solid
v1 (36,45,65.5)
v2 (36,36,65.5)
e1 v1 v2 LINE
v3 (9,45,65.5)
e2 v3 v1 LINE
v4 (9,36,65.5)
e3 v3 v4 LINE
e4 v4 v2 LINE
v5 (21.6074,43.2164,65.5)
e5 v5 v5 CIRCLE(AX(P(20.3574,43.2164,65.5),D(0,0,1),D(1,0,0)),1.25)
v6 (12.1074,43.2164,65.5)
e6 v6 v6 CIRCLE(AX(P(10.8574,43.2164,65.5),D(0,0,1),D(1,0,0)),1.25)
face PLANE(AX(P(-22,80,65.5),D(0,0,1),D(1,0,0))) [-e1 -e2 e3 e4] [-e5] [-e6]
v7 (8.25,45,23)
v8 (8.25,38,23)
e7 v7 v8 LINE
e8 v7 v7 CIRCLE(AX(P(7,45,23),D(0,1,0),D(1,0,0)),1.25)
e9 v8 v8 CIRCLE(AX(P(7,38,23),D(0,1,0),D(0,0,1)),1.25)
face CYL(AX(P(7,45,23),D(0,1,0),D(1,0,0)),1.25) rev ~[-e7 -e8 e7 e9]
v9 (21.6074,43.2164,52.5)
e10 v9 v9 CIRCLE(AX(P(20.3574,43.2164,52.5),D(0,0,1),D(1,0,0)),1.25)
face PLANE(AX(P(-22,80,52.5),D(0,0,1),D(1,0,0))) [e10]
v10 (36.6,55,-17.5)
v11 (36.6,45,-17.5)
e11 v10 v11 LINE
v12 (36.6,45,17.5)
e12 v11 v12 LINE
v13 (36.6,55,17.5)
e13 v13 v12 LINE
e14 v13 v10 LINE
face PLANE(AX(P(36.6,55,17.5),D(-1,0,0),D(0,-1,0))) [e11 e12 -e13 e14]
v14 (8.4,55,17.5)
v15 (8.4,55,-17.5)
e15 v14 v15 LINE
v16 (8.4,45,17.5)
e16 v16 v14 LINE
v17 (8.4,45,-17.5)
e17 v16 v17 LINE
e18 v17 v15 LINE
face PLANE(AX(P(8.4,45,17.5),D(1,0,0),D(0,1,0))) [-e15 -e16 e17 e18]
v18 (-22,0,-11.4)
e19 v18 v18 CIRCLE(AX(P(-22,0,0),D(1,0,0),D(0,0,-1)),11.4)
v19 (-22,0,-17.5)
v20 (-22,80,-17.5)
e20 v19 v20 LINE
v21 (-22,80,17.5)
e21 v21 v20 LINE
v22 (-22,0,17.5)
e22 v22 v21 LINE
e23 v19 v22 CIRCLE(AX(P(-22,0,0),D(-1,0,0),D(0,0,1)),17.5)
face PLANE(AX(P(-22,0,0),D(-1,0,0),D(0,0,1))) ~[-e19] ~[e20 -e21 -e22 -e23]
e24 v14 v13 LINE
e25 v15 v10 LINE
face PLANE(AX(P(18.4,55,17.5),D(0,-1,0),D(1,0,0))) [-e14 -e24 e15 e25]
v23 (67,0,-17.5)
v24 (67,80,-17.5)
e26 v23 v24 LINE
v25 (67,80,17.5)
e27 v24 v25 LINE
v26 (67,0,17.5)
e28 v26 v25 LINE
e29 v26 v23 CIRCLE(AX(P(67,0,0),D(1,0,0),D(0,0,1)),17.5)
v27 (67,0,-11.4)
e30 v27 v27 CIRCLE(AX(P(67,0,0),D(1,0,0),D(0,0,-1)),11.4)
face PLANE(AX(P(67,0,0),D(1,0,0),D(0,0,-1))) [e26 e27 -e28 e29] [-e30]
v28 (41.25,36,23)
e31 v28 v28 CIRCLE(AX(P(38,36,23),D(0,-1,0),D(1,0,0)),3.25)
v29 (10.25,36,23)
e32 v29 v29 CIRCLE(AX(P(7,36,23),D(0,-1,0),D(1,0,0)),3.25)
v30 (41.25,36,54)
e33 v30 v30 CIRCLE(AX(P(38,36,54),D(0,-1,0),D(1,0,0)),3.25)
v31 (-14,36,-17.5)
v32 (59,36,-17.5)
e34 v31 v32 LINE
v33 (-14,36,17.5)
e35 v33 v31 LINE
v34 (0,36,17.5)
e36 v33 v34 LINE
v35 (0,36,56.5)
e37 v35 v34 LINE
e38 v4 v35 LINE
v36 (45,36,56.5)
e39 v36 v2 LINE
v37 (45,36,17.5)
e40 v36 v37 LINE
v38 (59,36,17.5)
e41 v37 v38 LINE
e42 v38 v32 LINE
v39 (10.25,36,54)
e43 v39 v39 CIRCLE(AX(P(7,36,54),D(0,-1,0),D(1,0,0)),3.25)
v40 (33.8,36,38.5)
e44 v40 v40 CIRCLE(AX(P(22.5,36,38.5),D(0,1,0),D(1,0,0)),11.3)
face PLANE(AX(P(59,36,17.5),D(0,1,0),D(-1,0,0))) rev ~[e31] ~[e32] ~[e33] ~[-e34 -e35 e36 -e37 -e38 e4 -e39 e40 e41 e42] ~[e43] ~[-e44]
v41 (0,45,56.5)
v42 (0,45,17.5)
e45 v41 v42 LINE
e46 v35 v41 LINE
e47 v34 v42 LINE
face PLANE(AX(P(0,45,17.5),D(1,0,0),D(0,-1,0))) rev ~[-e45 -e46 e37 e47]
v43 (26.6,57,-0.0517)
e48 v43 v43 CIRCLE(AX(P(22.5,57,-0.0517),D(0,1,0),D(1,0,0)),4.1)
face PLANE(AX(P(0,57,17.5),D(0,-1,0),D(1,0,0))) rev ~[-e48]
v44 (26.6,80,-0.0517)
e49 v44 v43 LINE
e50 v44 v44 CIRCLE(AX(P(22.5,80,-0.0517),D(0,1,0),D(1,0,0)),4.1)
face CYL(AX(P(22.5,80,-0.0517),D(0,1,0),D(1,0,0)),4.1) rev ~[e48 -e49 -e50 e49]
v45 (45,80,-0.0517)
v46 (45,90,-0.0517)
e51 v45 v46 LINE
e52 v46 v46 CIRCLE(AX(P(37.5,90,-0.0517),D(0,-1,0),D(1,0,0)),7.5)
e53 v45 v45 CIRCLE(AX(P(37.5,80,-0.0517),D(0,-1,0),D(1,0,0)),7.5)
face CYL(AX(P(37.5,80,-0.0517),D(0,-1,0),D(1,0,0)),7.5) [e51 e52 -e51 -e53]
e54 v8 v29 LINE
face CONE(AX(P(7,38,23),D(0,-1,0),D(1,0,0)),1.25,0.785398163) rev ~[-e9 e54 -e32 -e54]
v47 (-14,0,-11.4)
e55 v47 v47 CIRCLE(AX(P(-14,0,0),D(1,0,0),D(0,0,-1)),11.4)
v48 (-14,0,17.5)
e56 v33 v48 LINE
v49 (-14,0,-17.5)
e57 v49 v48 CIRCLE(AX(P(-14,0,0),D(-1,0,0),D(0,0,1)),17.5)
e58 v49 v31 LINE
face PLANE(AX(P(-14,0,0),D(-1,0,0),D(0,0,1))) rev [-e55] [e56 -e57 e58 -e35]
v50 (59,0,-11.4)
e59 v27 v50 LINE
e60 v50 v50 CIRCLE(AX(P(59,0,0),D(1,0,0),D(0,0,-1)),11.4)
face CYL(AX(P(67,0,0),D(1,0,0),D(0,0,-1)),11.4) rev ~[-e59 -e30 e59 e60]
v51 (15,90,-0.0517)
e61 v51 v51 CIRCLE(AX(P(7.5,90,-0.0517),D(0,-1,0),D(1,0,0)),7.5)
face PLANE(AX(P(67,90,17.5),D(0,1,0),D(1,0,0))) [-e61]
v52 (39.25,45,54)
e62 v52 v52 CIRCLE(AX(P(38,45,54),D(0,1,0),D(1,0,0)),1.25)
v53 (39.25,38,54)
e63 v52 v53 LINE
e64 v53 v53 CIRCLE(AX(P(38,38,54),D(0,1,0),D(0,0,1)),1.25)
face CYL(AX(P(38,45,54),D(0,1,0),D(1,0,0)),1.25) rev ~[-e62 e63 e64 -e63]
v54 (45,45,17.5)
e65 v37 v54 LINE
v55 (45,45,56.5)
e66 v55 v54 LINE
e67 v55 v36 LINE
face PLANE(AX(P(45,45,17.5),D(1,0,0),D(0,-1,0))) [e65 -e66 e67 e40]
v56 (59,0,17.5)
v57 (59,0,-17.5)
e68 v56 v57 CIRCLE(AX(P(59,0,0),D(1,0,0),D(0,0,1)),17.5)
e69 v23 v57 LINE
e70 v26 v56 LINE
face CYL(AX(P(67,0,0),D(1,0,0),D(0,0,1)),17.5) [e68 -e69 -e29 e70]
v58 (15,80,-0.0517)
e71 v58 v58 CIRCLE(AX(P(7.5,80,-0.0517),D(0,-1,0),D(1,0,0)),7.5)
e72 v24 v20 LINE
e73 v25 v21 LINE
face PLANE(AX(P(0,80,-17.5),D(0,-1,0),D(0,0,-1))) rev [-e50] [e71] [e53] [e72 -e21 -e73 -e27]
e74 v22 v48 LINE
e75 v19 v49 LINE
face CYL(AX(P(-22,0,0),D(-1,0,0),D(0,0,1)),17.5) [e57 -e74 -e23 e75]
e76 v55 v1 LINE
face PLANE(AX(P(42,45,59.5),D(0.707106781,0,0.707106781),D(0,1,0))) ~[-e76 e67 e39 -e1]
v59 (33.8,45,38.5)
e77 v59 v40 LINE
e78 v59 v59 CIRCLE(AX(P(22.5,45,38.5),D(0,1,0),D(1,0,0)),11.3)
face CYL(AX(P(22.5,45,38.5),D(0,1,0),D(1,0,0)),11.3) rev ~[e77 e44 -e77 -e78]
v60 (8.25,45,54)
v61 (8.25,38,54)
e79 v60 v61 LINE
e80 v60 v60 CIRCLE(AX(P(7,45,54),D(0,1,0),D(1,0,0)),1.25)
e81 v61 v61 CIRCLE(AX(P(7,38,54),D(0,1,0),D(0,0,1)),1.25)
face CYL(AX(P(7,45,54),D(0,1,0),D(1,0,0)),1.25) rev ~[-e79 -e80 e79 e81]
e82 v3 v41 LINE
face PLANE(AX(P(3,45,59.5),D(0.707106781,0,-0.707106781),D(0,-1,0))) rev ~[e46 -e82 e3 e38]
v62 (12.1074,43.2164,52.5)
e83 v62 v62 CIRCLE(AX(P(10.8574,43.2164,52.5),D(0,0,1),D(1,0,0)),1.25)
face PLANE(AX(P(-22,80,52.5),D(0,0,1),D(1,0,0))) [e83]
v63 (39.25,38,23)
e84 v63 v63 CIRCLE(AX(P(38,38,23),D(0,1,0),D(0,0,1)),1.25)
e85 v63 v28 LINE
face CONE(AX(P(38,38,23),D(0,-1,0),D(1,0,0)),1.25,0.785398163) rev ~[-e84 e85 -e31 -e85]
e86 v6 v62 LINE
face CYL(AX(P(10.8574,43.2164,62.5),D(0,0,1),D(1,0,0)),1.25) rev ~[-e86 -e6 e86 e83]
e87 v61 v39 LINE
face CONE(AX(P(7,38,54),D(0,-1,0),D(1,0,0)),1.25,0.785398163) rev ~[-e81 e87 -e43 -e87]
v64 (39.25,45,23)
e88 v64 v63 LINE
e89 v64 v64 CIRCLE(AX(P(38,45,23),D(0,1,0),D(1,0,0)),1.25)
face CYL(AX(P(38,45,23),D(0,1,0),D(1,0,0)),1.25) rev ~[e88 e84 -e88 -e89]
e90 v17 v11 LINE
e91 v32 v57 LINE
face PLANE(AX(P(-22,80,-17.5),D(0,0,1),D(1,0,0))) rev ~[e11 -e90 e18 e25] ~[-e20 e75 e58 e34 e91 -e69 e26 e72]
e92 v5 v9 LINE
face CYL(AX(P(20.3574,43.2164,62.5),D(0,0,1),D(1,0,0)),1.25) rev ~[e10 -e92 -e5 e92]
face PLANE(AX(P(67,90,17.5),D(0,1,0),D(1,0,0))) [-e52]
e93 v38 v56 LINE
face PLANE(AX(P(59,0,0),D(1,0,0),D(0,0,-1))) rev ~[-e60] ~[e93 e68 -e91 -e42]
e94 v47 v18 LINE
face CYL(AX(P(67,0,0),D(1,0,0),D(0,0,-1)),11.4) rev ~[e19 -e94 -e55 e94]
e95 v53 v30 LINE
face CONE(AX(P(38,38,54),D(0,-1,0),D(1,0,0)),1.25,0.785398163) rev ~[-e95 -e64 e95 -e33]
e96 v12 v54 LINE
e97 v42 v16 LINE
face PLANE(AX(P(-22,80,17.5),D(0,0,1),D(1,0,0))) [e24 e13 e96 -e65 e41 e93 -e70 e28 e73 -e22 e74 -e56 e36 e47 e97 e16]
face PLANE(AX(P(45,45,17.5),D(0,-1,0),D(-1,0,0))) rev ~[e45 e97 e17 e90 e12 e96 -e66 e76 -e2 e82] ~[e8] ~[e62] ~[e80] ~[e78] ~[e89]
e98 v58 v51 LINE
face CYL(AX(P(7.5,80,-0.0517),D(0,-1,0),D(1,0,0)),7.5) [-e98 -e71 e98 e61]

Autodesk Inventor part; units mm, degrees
ref_plane "YZ Plane" through (0, 0, 0) normal (1, 0, 0) x (0, 1, 0)
ref_plane "XZ Plane" through (0, 0, 0) normal (0, 1, 0) x (-1, 0, 0)
sketch "Эскиз1" plane through (0, 0, 0) normal (1, 0, 0) x (0, 1, 0)
  line L0 (-6, -6.0208) -> (-6, 6.0208)
  arc A0 (-6, -6.0208) -> (6, -6.0208) centre (0, 0) ccw
  line L1 (6, 6.0208) -> (6, -6.0208)
  arc A1 (6, 6.0208) -> (-6, 6.0208) centre (0, 0) ccw
  circle A2 centre (0, 0) radius 17.5
  line L2 (0, 17.5) -> (80, 17.5)
  line L3 (80, 17.5) -> (80, -17.5)
  line L4 (80, -17.5) -> (0, -17.5)
  line L5 (0, -17.5) -> (0, -8.5)
  line L6 (0, 8.5) -> (0, 17.5)
  dimension "d0" = 35
  dimension "d1" = 80
extrude "Выдавливание1" add sketch "Эскиз1" along normal blind 45 contours A0 L5 A2 L6 A1 L0 | A0 L1 A1 L6 A2 L5 | A2 L2 L3 L4
sketch "Эскиз2" plane through (45, 0, 0) normal (1, 0, 0) x (0, 0, -1)
  line L0 (17.5, 80) -> (-17.5, 80) projected
  line L1 (17.5, 0) -> (17.5, 80) projected
  line L2 (-17.5, 80) -> (17.5, 80)
  line L3 (17.5, 80) -> (17.5, 57)
  line L4 (17.5, 57) -> (-17.5, 57)
  line L5 (-17.5, 57) -> (-17.5, 80)
  point P0 (0, 0)
  dimension "d4" = 23
extrude "Выдавливание2" add sketch "Эскиз2" along normal blind 22
ref_plane "РабПлоскость1" through (22.5, 0, 17.5) normal (1, 0, 0) x (0, 0, -1)
mirror "Зеркальное отражение1" about plane through (22.5, 0, 17.5) normal (1, 0, 0) of "Выдавливание2"
sketch "Эскиз3" plane through (45, 0, 0) normal (1, 0, 0) x (0, 0, -1)
  arc A0 (6.0208, -6) -> (6.0208, 6) centre (0, 0) ccw projected
  line L0 (6.0208, -6) -> (-6.0208, -6) projected
  arc A1 (-6.0208, 6) -> (-6.0208, -6) centre (0, 0) ccw projected
  line L1 (6.0208, 6) -> (-6.0208, 6) projected
  line L2 (17.5, 57) -> (-17.5, 57) projected
  line L3 (-17.5, 57) -> (-17.5, 0) projected
  arc A2 (-17.5, 0) -> (17.5, 0) centre (0, 0) ccw projected
  line L4 (17.5, 0) -> (17.5, 57) projected
sketch "Эскиз4" plane through (67, 0, 0) normal (1, 0, 0) x (0, 0, -1)
  arc A0 (6.0208, -6) -> (6.0208, 6) centre (0, 0) ccw
  line L0 (6.0208, -6) -> (-6.0208, -6)
  arc A1 (-6.0208, 6) -> (-6.0208, -6) centre (0, 0) ccw
  line L1 (6.0208, 6) -> (-6.0208, 6)
  line L2 (17.5, 37) -> (-17.5, 37)
  line L3 (-17.5, 37) -> (-17.5, 0)
  arc A2 (-17.5, 0) -> (17.5, 0) centre (0, 0) ccw
  line L4 (17.5, 0) -> (17.5, 37)
  line L5 (17.5, 0) -> (17.5, 57) projected
  line L6 (-17.5, 37) -> (17.5, 37)
  line L7 (17.5, 37) -> (17.5, 57)
  line L8 (17.5, 57) -> (-17.5, 57)
  line L9 (-17.5, 57) -> (-17.5, 37)
extrude "Выдавливание3" add sketch "Эскиз4" against normal blind 8
mirror "Зеркальное отражение2" about plane through (22.5, 0, 17.5) normal (1, 0, 0) of "Выдавливание3"
sketch "Эскиз5" plane through (67, 80, 17.5) normal (0, 1, 0) x (1, 0, 0)
  line L0 (-89, 35) -> (-89, 0) projected
  line L1 (-89, 35.1034) -> (-89, 0)
  line L2 (-89, 0) -> (-89, 35.1034)
  line L3 (-89, 35) -> (0, 35) projected
  line L4 (-89, 35) -> (0, 35)
  line L5 (-89, 17.5517) -> (-44.5, 17.5517)
  circle A0 centre (-44.5, 17.5517) radius 4.1
  line L6 (-44.5, 17.5517) -> (-59.5, 17.5517)
  circle A1 centre (-59.5, 17.5517) radius 7.5
  line L7 (-44.5, 17.5517) -> (-29.5, 17.5517)
  circle A2 centre (-29.5, 17.5517) radius 7.5
  point P0 (-67, 17.5)
  dimension "d9" = 8.2
  dimension "d10" = 15
  dimension "d11" = 15
  dimension "d12" = 15
  dimension "d13" = 15
extrude "Выдавливание4" add sketch "Эскиз5" along normal blind 10 contours L5 A1 | L5 A1 | A2
sketch "Эскиз6" plane through (67, 80, 17.5) normal (0, 1, 0) x (1, 0, 0)
  line L0 (-89, 35) -> (-89, 0)
  line L1 (-89, 35.1034) -> (-89, 0)
  line L2 (-89, 0) -> (-89, 35.1034)
  line L3 (-89, 35) -> (0, 35)
  line L4 (-89, 35) -> (0, 35)
  line L5 (-89, 17.5517) -> (-44.5, 17.5517)
  circle A0 centre (-44.5, 17.5517) radius 4.1
  line L6 (-44.5, 17.5517) -> (-59.5, 17.5517)
  circle A1 centre (-59.5, 17.5517) radius 7.5
  line L7 (-44.5, 17.5517) -> (-29.5, 17.5517)
  circle A2 centre (-29.5, 17.5517) radius 7.5
  point P0 (-67, 17.5)
  point P1 (-67, 17.5)
  dimension "d16" = 8.2
  dimension "d17" = 15
  dimension "d18" = 15
  dimension "d19" = 15
  dimension "d20" = 15
extrude "Выдавливание5" cut sketch "Эскиз6" against normal blind 35 contours A0 L7 L5 | L5 L7 A0
sketch "Эскиз7" plane through (0, 0, 17.5) normal (0, 0, 1) x (1, 0, 0)
  line L0 (18.4, 80) -> (18.4, 45) projected
  line L1 (26.6, 80) -> (26.6, 45) projected
  line L2 (0, 57) -> (0, 0) projected
  line L3 (45, 0) -> (0, 0) projected
  line L4 (45, 57) -> (45, 0) projected
  line L5 (45, 57) -> (59, 57) projected
  line L6 (67, 80) -> (67, 0) projected
  line L7 (-22, 80) -> (67, 80) projected
  line L8 (-22, 80) -> (-22, 0) projected
  line L9 (0, 57) -> (-14, 57) projected
  line L10 (18.4, 45) -> (26.6, 45) projected
  line L11 (18.4, 45) -> (8.4, 45)
  line L12 (8.4, 45) -> (8.4, 55)
  line L13 (8.4, 55) -> (36.6, 55)
  line L14 (36.6, 55) -> (36.6, 45)
  line L15 (26.6, 45) -> (36.6, 45)
  line L16 (18.4, 45) -> (26.6, 45)
  line L17 (59, 0) -> (59, 57) projected
  line L18 (67, 0) -> (59, 0) projected
  line L19 (-22, 0) -> (-14, 0) projected
  line L20 (-14, 0) -> (-14, 57) projected
  dimension "d23" = 10
  dimension "d24" = 10
  dimension "d25" = 28.2
  dimension "d26" = 10
extrude "Выдавливание6" cut sketch "Эскиз7" against normal blind 84.5 contours L13 L1 L10 L0 | L0 L11 L12 L13 | L13 L14 L15 L1
sketch "Эскиз8" plane through (0, 0, 17.5) normal (0, 0, 1) x (1, 0, 0)
  line L0 (8.4, 45) -> (36.6, 45) projected
  line L1 (8.4, 45) -> (0, 45)
  line L2 (0, 45) -> (0, 36)
  line L3 (0, 0) -> (0, 57) projected
  line L4 (45, -17.5) -> (45, 0) projected
  line L5 (0, 36) -> (45, 36)
  line L6 (45, 36) -> (45, -17.5)
  line L7 (45, -17.5) -> (0, -17.5)
  line L8 (0, -17.5) -> (0, 36)
  dimension "d29" = 9
extrude "Выдавливание7" cut sketch "Эскиз8" against normal blind 85.25
sketch "Эскиз9" plane through (67, 0, 0) normal (1, 0, 0) x (0, 0, -1)
  circle A0 centre (0, 0) radius 11.4
  dimension "d32" = 22.8
extrude "Выдавливание8" cut sketch "Эскиз9" against normal blind 144.5
sketch "Эскиз10" plane through (-22, 80, 17.5) normal (0, 0, 1) x (1, 0, 0)
  line L0 (22, -23) -> (22, -44) projected
  line L1 (67, -23) -> (67, -44) projected
  line L2 (22, -44) -> (67, -44)
  line L3 (67, -44) -> (67, -35)
  line L4 (67, -35) -> (22, -35)
  line L5 (22, -35) -> (22, -44)
  point P0 (22, -80)
  dimension "d35" = 9
extrude "Выдавливание9" add sketch "Эскиз10" along normal blind 45
sketch "Эскиз11" plane through (67, 45, 17.5) normal (0, 1, 0) x (1, 0, 0)
  line L0 (-67, 0) -> (-67, 35) projected
  line L1 (-67, 0) -> (-44.5, 0)
  line L2 (-67, 0) -> (-58.6, 0) projected
  line L3 (-22, -45) -> (-67, -45) projected
  line L4 (-44.5, -45) -> (-44.5, -21)
  line L5 (-27, -42) -> (-23.5, -38.5)
  line L6 (-23.5, -38.5) -> (-23.5, -3.5)
  line L7 (-23.5, -3.5) -> (-27, 0)
  line L8 (-27, 0) -> (-62, 0)
  line L9 (-62, 0) -> (-65.5, -3.5)
  line L10 (-65.5, -3.5) -> (-65.5, -38.5)
  line L11 (-65.5, -38.5) -> (-62, -42)
  line L12 (-62, -42) -> (-27, -42)
  circle A0 centre (-44.5, -21) radius 11.3
  circle A1 centre (-29, -5.5) radius 1.25
  circle A2 centre (-60, -5.5) radius 1.25
  circle A3 centre (-60, -36.5) radius 1.25
  circle A4 centre (-29, -36.5) radius 1.25
  line L13 (-52.5, -48) -> (-50.5, -48)
  line L14 (-50.5, -41.8) -> (-50.5, -48)
  line L15 (-57.9172, -41.8) -> (-50.5, -41.8)
  line L16 (-65.3, -34.4172) -> (-57.9172, -41.8)
  line L17 (-65.3, -7.5828) -> (-65.3, -34.4172)
  line L18 (-57.9172, -0.2) -> (-65.3, -7.5828)
  line L19 (-31.0828, -0.2) -> (-57.9172, -0.2)
  line L20 (-23.7, -7.5828) -> (-31.0828, -0.2)
  line L21 (-23.7, -34.4172) -> (-23.7, -7.5828)
  line L22 (-31.0828, -41.8) -> (-23.7, -34.4172)
  line L23 (-38.5, -41.8) -> (-31.0828, -41.8)
  line L24 (-38.5, -41.8) -> (-38.5, -48)
  line L25 (-38.5, -48) -> (-36.5, -48)
  line L26 (-36.5, -48) -> (-36.5, -42)
  line L27 (-36.5, -42) -> (-27, -42)
  line L28 (-27, -42) -> (-23.5, -38.5)
  line L29 (-23.5, -38.5) -> (-23.5, -3.5)
  line L30 (-23.5, -3.5) -> (-27, 0)
  line L31 (-27, 0) -> (-62, 0)
  line L32 (-62, 0) -> (-65.5, -3.5)
  line L33 (-65.5, -3.5) -> (-65.5, -38.5)
  line L34 (-65.5, -38.5) -> (-62, -42)
  line L35 (-62, -42) -> (-52.5, -42)
  line L36 (-52.5, -42) -> (-52.5, -48)
  point P0 (-67, 17.5)
  dimension "d38" = 22.5
  dimension "d39" = 24
extrude "Выдавливание10" cut sketch "Эскиз11" against normal blind 45 contours A0 | A1 | A2 | A3 | A4
chamfer "Фаска1" distance 2 angle 45 4 edges at (5.75, 36, 54) (5.75, 36, 23) (36.75, 36, 23) (36.75, 36, 54)
chamfer "Фаска2" distance 6 angle 45 2 edges at (0, 40.5, 62.5) (45, 40.5, 62.5)
sketch "Эскиз13" plane through (-22, 80, 17.5) normal (0, 0, 1) x (1, 0, 0)
  line L0 (81, -80) -> (81, -23) projected
  line L1 (22, -23) -> (8, -23) projected
  line L2 (81, -44) -> (8, -44)
  line L3 (8, -44) -> (8, -23)
  line L4 (8, -23) -> (81, -23)
  line L5 (81, -23) -> (81, -44)
  line L6 (61, -44) -> (67, -44) projected
  line L7 (22, -35) -> (30.4, -35) projected
  line L8 (30.4, -25) -> (58.6, -25) projected
  line L9 (30.4, -35) -> (58.6, -35)
  line L10 (58.6, -35) -> (58.6, -25)
  line L11 (58.6, -25) -> (30.4, -25)
  line L12 (30.4, -25) -> (30.4, -35)
  point P0 (22, -80)
  dimension "d51" = 0
extrude "Выдавливание12" add sketch "Эскиз13" against normal up to surface (35 mm away)
sketch "Эскиз14" plane through (-22, 80, 62.5) normal (0, 0, 1) x (1, 0, 0)
  line L0 (27.8074, -44.5836) -> (28.32, -44.5836)
  line L1 (28.32, -44.5836) -> (28.4117, -43.1496)
  arc A0 (32.6031, -43.1496) -> (28.4117, -43.1496) centre (30.5074, -43.2836) ccw
  line L2 (32.6031, -43.1496) -> (32.6948, -44.5836)
  line L3 (32.6948, -44.5836) -> (36.9831, -44.5836)
  arc A1 (36.9831, -44.5836) -> (37.0538, -44.5543) centre (36.9831, -44.4836) ccw
  line L4 (37.0538, -44.5543) -> (37.3781, -44.23)
  arc A2 (37.7316, -44.0836) -> (37.3781, -44.23) centre (37.7316, -44.5836) ccw
  line L5 (37.7316, -44.0836) -> (47.4074, -44.0836)
  arc A3 (47.4074, -44.0836) -> (47.5074, -43.9836) centre (47.4074, -43.9836) ccw
  line L6 (47.5074, -43.9836) -> (47.5074, -34.8336)
  arc A4 (47.5074, -34.8336) -> (47.4074, -34.7336) centre (47.4074, -34.8336) ccw
  line L7 (47.4074, -34.7336) -> (44.4816, -34.7336)
  arc A5 (44.1281, -34.5871) -> (44.4816, -34.7336) centre (44.4816, -34.2336) ccw
  line L8 (44.1281, -34.5871) -> (43.8038, -34.2629)
  arc A6 (43.8038, -34.2629) -> (43.7331, -34.2336) centre (43.7331, -34.3336) ccw
  line L9 (43.7331, -34.2336) -> (40.9816, -34.2336)
  arc A7 (40.9816, -34.2336) -> (40.9109, -34.2629) centre (40.9816, -34.3336) ccw
  line L10 (40.9109, -34.2629) -> (40.5867, -34.5871)
  arc A8 (40.2331, -34.7336) -> (40.5867, -34.5871) centre (40.2331, -34.2336) ccw
  line L11 (40.2331, -34.7336) -> (34.9816, -34.7336)
  arc A9 (34.6281, -34.5871) -> (34.9816, -34.7336) centre (34.9816, -34.2336) ccw
  line L12 (34.6281, -34.5871) -> (34.3038, -34.2629)
  arc A10 (34.3038, -34.2629) -> (34.2331, -34.2336) centre (34.2331, -34.3336) ccw
  line L13 (34.2331, -34.2336) -> (31.4816, -34.2336)
  arc A11 (31.4816, -34.2336) -> (31.4109, -34.2629) centre (31.4816, -34.3336) ccw
  line L14 (31.4109, -34.2629) -> (31.0867, -34.5871)
  arc A12 (30.7331, -34.7336) -> (31.0867, -34.5871) centre (30.7331, -34.2336) ccw
  line L15 (30.7331, -34.7336) -> (27.8074, -34.7336)
  arc A13 (27.8074, -34.7336) -> (27.7074, -34.8336) centre (27.8074, -34.8336) ccw
  line L16 (27.7074, -34.8336) -> (27.7074, -44.4836)
  arc A14 (27.7074, -44.4836) -> (27.8074, -44.5836) centre (27.8074, -44.4836) ccw
  circle A15 centre (32.8574, -36.7836) radius 1.25
  circle A16 centre (42.3574, -36.7836) radius 1.25
  line L17 (43.5307, -39.0336) -> (42.914, -40.3336)
  line L18 (42.914, -40.3336) -> (42.8974, -40.3336)
  line L19 (42.8974, -40.3336) -> (42.2974, -39.0336)
  line L20 (42.2974, -39.0336) -> (42.4242, -39.0336)
  line L21 (42.4242, -39.0336) -> (42.6164, -39.4502)
  line L22 (42.6164, -39.4502) -> (43.2057, -39.4502)
  line L23 (43.2057, -39.4502) -> (43.4034, -39.0336)
  line L24 (43.4034, -39.0336) -> (43.5307, -39.0336)
  spline S0 degree 3 poles (40.7107, -39.97) (40.711, -39.9789) (40.7114, -39.9964) (40.7155, -40.022) (40.7217, -40.0467) (40.7306, -40.0706) (40.7424, -40.0934) (40.7567, -40.1152) (40.7731, -40.1363) (40.7922, -40.156) (40.8132, -40.1741) (40.8353, -40.1901) (40.8587, -40.2035) (40.8833, -40.2145) (40.909, -40.2231) (40.9359, -40.2291) (40.9639, -40.2328) (40.983, -40.2333) (40.9927, -40.2336) knots 0 0 0 0 0.061965 0.122122 0.180988 0.239933 0.299906 0.359989 0.421776 0.486576 0.551535 0.615018 0.677259 0.73973 0.80305 0.866495 0.931973 1 1 1 1
  spline S1 degree 3 poles (40.9927, -40.2336) (41.0029, -40.2333) (41.0229, -40.2328) (41.0522, -40.2291) (41.0802, -40.2228) (41.1068, -40.2142) (41.1323, -40.2033) (41.1564, -40.1897) (41.1791, -40.1734) (41.2004, -40.155) (41.22, -40.1344) (41.2373, -40.1115) (41.2523, -40.0867) (41.2655, -40.06) (41.2762, -40.0312) (41.2843, -40.0004) (41.2908, -39.9677) (41.2929, -39.9451) (41.294, -39.9336) knots 0 0 0 0 0.064439 0.126547 0.186887 0.245878 0.304041 0.362191 0.420976 0.48066 0.5406 0.600689 0.661936 0.724443 0.789038 0.856314 0.926352 1 1 1 1
  line L25 (41.294, -39.9336) -> (41.4107, -39.9336)
  spline S2 degree 3 poles (41.4107, -39.9336) (41.41, -39.949) (41.4085, -39.9794) (41.4015, -40.0238) (41.3915, -40.0661) (41.3773, -40.1062) (41.3597, -40.1443) (41.3387, -40.1803) (41.3137, -40.2141) (41.2854, -40.2454) (41.2547, -40.2741) (41.2215, -40.2988) (41.1866, -40.3197) (41.1502, -40.3372) (41.1118, -40.3504) (41.0717, -40.3601) (41.0298, -40.366) (41.0013, -40.3666) (40.9868, -40.3669) knots 0 0 0 0 0.068791 0.135103 0.198979 0.261904 0.323495 0.385195 0.446969 0.509765 0.572251 0.633405 0.693251 0.752583 0.812579 0.873275 0.93555 1 1 1 1
  spline S3 degree 3 poles (40.9868, -40.3669) (40.9725, -40.3666) (40.9445, -40.3659) (40.9036, -40.3603) (40.8647, -40.3515) (40.8278, -40.3391) (40.7933, -40.3225) (40.7608, -40.3025) (40.73, -40.2794) (40.7023, -40.2522) (40.6769, -40.2231) (40.6549, -40.1921) (40.6361, -40.1601) (40.6204, -40.1268) (40.6089, -40.0919) (40.6001, -40.056) (40.5952, -40.0186) (40.5944, -39.9933) (40.594, -39.9804) knots 0 0 0 0 0.069475 0.136517 0.200789 0.26383 0.325735 0.387291 0.449509 0.512968 0.576275 0.63758 0.697903 0.757172 0.816599 0.876653 0.93729 1 1 1 1
  spline S4 degree 3 poles (40.594, -39.9804) (40.5947, -39.9623) (40.5959, -39.9264) (40.6066, -39.8737) (40.6232, -39.8226) (40.6433, -39.7815) (40.6635, -39.7483) (40.6818, -39.721) (40.7031, -39.6916) (40.7279, -39.6603) (40.7556, -39.6266) (40.7864, -39.5908) (40.8206, -39.5531) (40.8446, -39.5274) (40.8571, -39.514) knots 0 0 0 0 0.098702 0.195672 0.292422 0.391343 0.444462 0.504229 0.570352 0.642546 0.722288 0.807921 0.90047 1 1 1 1
  line L26 (40.8571, -39.514) -> (41.1823, -39.1669)
  line L27 (41.1823, -39.1669) -> (40.5774, -39.1669)
  line L28 (40.5774, -39.1669) -> (40.5774, -39.0336)
  line L29 (40.5774, -39.0336) -> (41.4607, -39.0336)
  line L30 (41.4607, -39.0336) -> (40.9565, -39.5716)
  spline S5 degree 3 poles (40.9565, -39.5716) (40.9443, -39.5844) (40.9207, -39.609) (40.8873, -39.6449) (40.8574, -39.6783) (40.8306, -39.709) (40.8077, -39.7374) (40.7873, -39.7628) (40.771, -39.7861) (40.7532, -39.8131) (40.7361, -39.8461) (40.7213, -39.8864) (40.7123, -39.9279) (40.7113, -39.9559) (40.7107, -39.97) knots 0 0 0 0 0.110803 0.212829 0.306101 0.390647 0.466924 0.534481 0.593587 0.644557 0.7362 0.825024 0.911986 1 1 1 1
  line L31 (40.2007, -39.6836) -> (40.0674, -40.3336)
  line L32 (40.0674, -40.3336) -> (39.534, -40.3336)
  line L33 (39.534, -40.3336) -> (39.534, -40.2002)
  line L34 (39.534, -40.2002) -> (39.9762, -40.2002)
  line L35 (39.9762, -40.2002) -> (40.0463, -39.8583)
  spline S6 degree 3 poles (40.0463, -39.8583) (40.0325, -39.8621) (40.0059, -39.8695) (39.9665, -39.8776) (39.9291, -39.8826) (39.9049, -39.8832) (39.8932, -39.8836) knots 0 0 0 0 0.275068 0.532901 0.773973 1 1 1 1
  spline S7 degree 3 poles (39.8932, -39.8836) (39.8786, -39.8833) (39.8501, -39.8826) (39.8083, -39.8767) (39.7685, -39.8674) (39.7306, -39.8543) (39.6946, -39.8376) (39.6609, -39.8168) (39.6289, -39.7925) (39.5992, -39.7645) (39.5722, -39.7337) (39.5486, -39.7006) (39.5284, -39.6655) (39.5123, -39.628) (39.4993, -39.5887) (39.4907, -39.547) (39.485, -39.5033) (39.4844, -39.4735) (39.484, -39.4583) knots 0 0 0 0 0.065808 0.129394 0.190894 0.251281 0.310815 0.370371 0.430768 0.492881 0.555104 0.616067 0.677256 0.73826 0.800762 0.864778 0.931045 1 1 1 1
  spline S8 degree 3 poles (39.484, -39.4583) (39.4843, -39.4477) (39.4848, -39.4267) (39.4873, -39.3954) (39.4921, -39.3648) (39.4985, -39.3349) (39.5069, -39.3057) (39.517, -39.2771) (39.5295, -39.2493) (39.5431, -39.2221) (39.5584, -39.196) (39.5754, -39.1716) (39.5933, -39.1485) (39.6127, -39.1271) (39.6335, -39.1073) (39.6557, -39.0891) (39.679, -39.0722) (39.7038, -39.0573) (39.7294, -39.0436) (39.7564, -39.0323) (39.7841, -39.0222) (39.8128, -39.0142) (39.8426, -39.0079) (39.8734, -39.0036) (39.9051, -39.0005) (39.9266, -39.0003) (39.9374, -39.0002) knots 0 0 0 0 0.044014 0.087434 0.130118 0.172554 0.214555 0.256298 0.298438 0.340849 0.382715 0.423924 0.464246 0.504074 0.543862 0.583567 0.623094 0.663229 0.703551 0.743938 0.784541 0.82575 0.867757 0.910745 0.954914 1 1 1 1
  spline S9 degree 3 poles (39.9374, -39.0002) (39.9504, -39.0005) (39.9759, -39.001) (40.0132, -39.0063) (40.0491, -39.0138) (40.0834, -39.0252) (40.1162, -39.0395) (40.1472, -39.0575) (40.1771, -39.0779) (40.2048, -39.102) (40.2305, -39.1284) (40.2535, -39.1569) (40.2739, -39.1873) (40.2916, -39.2196) (40.3066, -39.2537) (40.3184, -39.2898) (40.328, -39.3276) (40.332, -39.3537) (40.334, -39.3669) knots 0 0 0 0 0.065421 0.128708 0.190236 0.250724 0.310637 0.370766 0.431615 0.493523 0.555883 0.617342 0.678668 0.740711 0.802985 0.866803 0.932347 1 1 1 1
  line L36 (40.334, -39.3669) -> (40.2174, -39.3669)
  spline S10 degree 3 poles (40.2174, -39.3669) (40.2145, -39.3545) (40.209, -39.3307) (40.1969, -39.2972) (40.1821, -39.2674) (40.1645, -39.2408) (40.1435, -39.2176) (40.1195, -39.1969) (40.0926, -39.1783) (40.0628, -39.1628) (40.0313, -39.1495) (39.9983, -39.1407) (39.9647, -39.1345) (39.9421, -39.1339) (39.9307, -39.1336) knots 0 0 0 0 0.094687 0.181994 0.264377 0.34218 0.418618 0.496509 0.577369 0.661511 0.746733 0.831258 0.915206 1 1 1 1
  spline S11 degree 3 poles (39.9307, -39.1336) (39.9195, -39.1339) (39.8976, -39.1345) (39.8654, -39.1391) (39.8343, -39.1462) (39.8045, -39.1569) (39.7757, -39.1698) (39.7486, -39.1864) (39.7222, -39.2055) (39.6975, -39.2274) (39.6749, -39.2516) (39.655, -39.2774) (39.6384, -39.3049) (39.6243, -39.3337) (39.6137, -39.364) (39.6061, -39.3958) (39.6016, -39.429) (39.601, -39.4517) (39.6007, -39.4633) knots 0 0 0 0 0.064207 0.126425 0.18768 0.248216 0.308305 0.369661 0.431699 0.495947 0.559758 0.622295 0.683911 0.745092 0.80674 0.869087 0.93329 1 1 1 1
  spline S12 degree 3 poles (39.6007, -39.4633) (39.601, -39.4737) (39.6014, -39.4941) (39.6054, -39.524) (39.6122, -39.5522) (39.6216, -39.579) (39.6336, -39.6043) (39.6482, -39.6283) (39.6658, -39.6504) (39.6859, -39.6709) (39.7079, -39.6898) (39.7322, -39.7059) (39.7583, -39.7194) (39.7859, -39.7311) (39.8156, -39.7395) (39.8468, -39.7458) (39.88, -39.7495) (39.9026, -39.75) (39.9143, -39.7502) knots 0 0 0 0 0.065351 0.127916 0.18836 0.247216 0.30563 0.36377 0.422661 0.482687 0.5433 0.604118 0.664965 0.727413 0.791468 0.858055 0.927037 1 1 1 1
  spline S13 degree 3 poles (39.9143, -39.7502) (39.9243, -39.75) (39.9451, -39.7496) (39.9771, -39.7463) (40.0106, -39.741) (40.0456, -39.7337) (40.0823, -39.7242) (40.1204, -39.7128) (40.1602, -39.6992) (40.1869, -39.6889) (40.2007, -39.6836) knots 0 0 0 0 0.102203 0.211023 0.3251 0.446502 0.573788 0.708901 0.850358 1 1 1 1
  line L37 (36.754, -39.0336) -> (36.1374, -40.3336)
  line L38 (36.1374, -40.3336) -> (36.1207, -40.3336)
  line L39 (36.1207, -40.3336) -> (35.5207, -39.0336)
  line L40 (35.5207, -39.0336) -> (35.6475, -39.0336)
  line L41 (35.6475, -39.0336) -> (35.8397, -39.4502)
  line L42 (35.8397, -39.4502) -> (36.429, -39.4502)
  line L43 (36.429, -39.4502) -> (36.6267, -39.0336)
  line L44 (36.6267, -39.0336) -> (36.754, -39.0336)
  spline S14 degree 3 poles (35.244, -39.6911) (35.2435, -39.7145) (35.2423, -39.7605) (35.2327, -39.828) (35.2171, -39.8927) (35.1951, -39.9544) (35.1671, -40.0135) (35.1326, -40.0696) (35.0918, -40.1229) (35.0452, -40.1727) (34.9941, -40.2182) (34.9394, -40.2582) (34.8812, -40.2915) (34.8201, -40.3194) (34.7556, -40.3408) (34.688, -40.3558) (34.6173, -40.3651) (34.5691, -40.3663) (34.5446, -40.3669) knots 0 0 0 0 0.064558 0.127014 0.187955 0.248014 0.307748 0.368235 0.42947 0.492743 0.556258 0.618217 0.679655 0.741246 0.803415 0.866815 0.932328 1 1 1 1
  spline S15 degree 3 poles (34.5446, -40.3669) (34.5296, -40.3667) (34.5001, -40.3664) (34.4563, -40.3629) (34.4137, -40.3571) (34.3723, -40.3493) (34.3318, -40.3396) (34.2925, -40.3269) (34.2542, -40.3124) (34.2171, -40.2957) (34.1815, -40.2769) (34.1473, -40.2564) (34.1148, -40.234) (34.0838, -40.21) (34.0548, -40.1838) (34.0269, -40.1562) (34.0012, -40.1265) (33.9853, -40.1055) (33.9774, -40.095) knots 0 0 0 0 0.068548 0.135683 0.201215 0.265682 0.329267 0.392395 0.45507 0.517127 0.57879 0.63974 0.700192 0.759806 0.819628 0.879355 0.939512 1 1 1 1
  line L45 (33.9774, -40.095) -> (34.0795, -40.0169)
  spline S16 degree 3 poles (34.0795, -40.0169) (34.0867, -40.0256) (34.1012, -40.0428) (34.1245, -40.067) (34.1487, -40.0897) (34.174, -40.111) (34.2006, -40.1301) (34.2281, -40.148) (34.2567, -40.1641) (34.2964, -40.1836) (34.3483, -40.2039) (34.4135, -40.2209) (34.4817, -40.2318) (34.5282, -40.233) (34.5519, -40.2336) knots 0 0 0 0 0.063163 0.125475 0.187121 0.248294 0.309295 0.36985 0.430973 0.492456 0.616148 0.740844 0.868183 1 1 1 1
  spline S17 degree 3 poles (34.5519, -40.2336) (34.5649, -40.2334) (34.5908, -40.2331) (34.6293, -40.2292) (34.6671, -40.2236) (34.7041, -40.2154) (34.7404, -40.205) (34.7761, -40.1926) (34.8107, -40.1773) (34.8447, -40.1603) (34.8773, -40.1411) (34.9082, -40.1202) (34.9372, -40.0978) (34.9643, -40.0738) (34.9896, -40.0483) (35.0129, -40.021) (35.0342, -39.9921) (35.0538, -39.9619) (35.0713, -39.9305) (35.086, -39.8978) (35.099, -39.8643) (35.1093, -39.8297) (35.1174, -39.7942) (35.123, -39.7577) (35.1269, -39.7204) (35.1272, -39.695) (35.1274, -39.6823) knots 0 0 0 0 0.043955 0.087502 0.130463 0.172752 0.215403 0.25765 0.300153 0.343121 0.385925 0.427686 0.468818 0.509492 0.549883 0.58998 0.630405 0.670869 0.711384 0.751627 0.791776 0.832459 0.873319 0.914543 0.956924 1 1 1 1
  spline S18 degree 3 poles (35.1274, -39.6823) (35.1269, -39.6631) (35.126, -39.6253) (35.1178, -39.5701) (35.1054, -39.5171) (35.0867, -39.4668) (35.0637, -39.4186) (35.0346, -39.3732) (35.001, -39.33) (34.9623, -39.2899) (34.9198, -39.2533) (34.8742, -39.2211) (34.8256, -39.1942) (34.7746, -39.1719) (34.7207, -39.1547) (34.6641, -39.1426) (34.6049, -39.1347) (34.5644, -39.134) (34.5438, -39.1336) knots 0 0 0 0 0.064323 0.12629 0.186726 0.246146 0.305576 0.365429 0.426326 0.48884 0.551725 0.613919 0.675484 0.737334 0.800229 0.864502 0.931041 1 1 1 1
  spline S19 degree 3 poles (34.5438, -39.1336) (34.5211, -39.1342) (34.4764, -39.1354) (34.4109, -39.1459) (34.3482, -39.1628) (34.2883, -39.1866) (34.2313, -39.2174) (34.1773, -39.2548) (34.126, -39.2991) (34.0952, -39.333) (34.0795, -39.3502) knots 0 0 0 0 0.128515 0.252949 0.374755 0.49594 0.617181 0.740909 0.867811 1 1 1 1
  line L46 (34.0795, -39.3502) -> (33.9774, -39.2729)
  spline S20 degree 3 poles (33.9774, -39.2729) (33.9856, -39.2623) (34.002, -39.2411) (34.0285, -39.2113) (34.0565, -39.1833) (34.0861, -39.1572) (34.1169, -39.1327) (34.1497, -39.1103) (34.1838, -39.0897) (34.2192, -39.0709) (34.2559, -39.0542) (34.2938, -39.04) (34.3327, -39.0277) (34.3727, -39.0175) (34.4138, -39.0096) (34.4559, -39.0043) (34.4991, -39.0007) (34.5282, -39.0004) (34.543, -39.0002) knots 0 0 0 0 0.061674 0.123053 0.183475 0.243727 0.304279 0.364863 0.425946 0.487391 0.54922 0.611144 0.673529 0.736961 0.800785 0.866013 0.932101 1 1 1 1
  spline S21 degree 3 poles (34.543, -39.0002) (34.557, -39.0003) (34.5846, -39.0005) (34.6255, -39.0036) (34.6652, -39.0079) (34.7037, -39.0143) (34.7413, -39.0219) (34.7775, -39.032) (34.8128, -39.0433) (34.847, -39.0567) (34.88, -39.0717) (34.9119, -39.0887) (34.9426, -39.1075) (34.9724, -39.1278) (35.0009, -39.1501) (35.0282, -39.1741) (35.0546, -39.1998) (35.071, -39.2183) (35.0792, -39.2276) knots 0 0 0 0 0.069663 0.13775 0.203917 0.26878 0.332414 0.394754 0.45618 0.516996 0.577396 0.637198 0.696999 0.756756 0.816554 0.876948 0.938132 1 1 1 1
  spline S22 degree 3 poles (35.0792, -39.2276) (35.0924, -39.2438) (35.1185, -39.2759) (35.152, -39.328) (35.1807, -39.3824) (35.2038, -39.4394) (35.2219, -39.4988) (35.2345, -39.5608) (35.2426, -39.6251) (35.2436, -39.6689) (35.244, -39.6911) knots 0 0 0 0 0.124329 0.247156 0.36878 0.490734 0.613614 0.738958 0.867311 1 1 1 1
  line L47 (32.1714, -40.2836) -> (32.3842, -40.2836)
  line L48 (32.5718, -39.1836) -> (32.1714, -40.2836)
  line L49 (32.0718, -39.1836) -> (32.5718, -39.1836)
  line L50 (31.6714, -40.2836) -> (32.0718, -39.1836)
  line L51 (31.4585, -40.2836) -> (31.6714, -40.2836)
  line L52 (31.8589, -39.1836) -> (31.4585, -40.2836)
  line L53 (31.6589, -39.1836) -> (31.8589, -39.1836)
  line L54 (31.7317, -38.9836) -> (31.6589, -39.1836)
  line L55 (32.8574, -38.9836) -> (31.7317, -38.9836)
  line L56 (32.3842, -40.2836) -> (32.8574, -38.9836)
  line L57 (37.5474, -39.0336) -> (37.564, -39.0336)
  line L58 (37.564, -39.0336) -> (38.114, -40.3336)
  line L59 (38.114, -40.3336) -> (37.989, -40.3336)
  line L60 (37.989, -40.3336) -> (37.5557, -39.3091)
  line L61 (37.5557, -39.3091) -> (37.1224, -40.3336)
  line L62 (37.1224, -40.3336) -> (36.9974, -40.3336)
  line L63 (36.9974, -40.3336) -> (37.5474, -39.0336)
  spline S23 degree 3 poles (38.3574, -39.683) (38.3576, -39.6632) (38.3581, -39.6244) (38.3605, -39.5678) (38.3654, -39.5143) (38.3714, -39.4638) (38.3797, -39.4167) (38.39, -39.3725) (38.4014, -39.3313) (38.4154, -39.2934) (38.4308, -39.2581) (38.4475, -39.2252) (38.4654, -39.1943) (38.485, -39.1657) (38.5058, -39.1392) (38.5284, -39.1152) (38.552, -39.0932) (38.577, -39.0737) (38.6032, -39.0566) (38.6299, -39.0412) (38.6577, -39.0289) (38.6859, -39.0183) (38.7149, -39.0102) (38.7447, -39.0046) (38.7752, -39.0007) (38.7957, -39.0004) (38.8061, -39.0002) knots 0 0 0 0 0.065063 0.126773 0.185516 0.240765 0.29298 0.34225 0.388919 0.432776 0.474628 0.514775 0.553606 0.591426 0.628028 0.663804 0.698984 0.733591 0.767628 0.801208 0.834264 0.866981 0.89972 0.932702 0.966176 1 1 1 1
  spline S24 degree 3 poles (38.8061, -39.0002) (38.8163, -39.0004) (38.8365, -39.0007) (38.8665, -39.0043) (38.8956, -39.01) (38.9239, -39.0179) (38.9517, -39.0277) (38.9784, -39.0403) (39.0046, -39.055) (39.0299, -39.0716) (39.0541, -39.0907) (39.0771, -39.1117) (39.0985, -39.1354) (39.1185, -39.1612) (39.1374, -39.1889) (39.1548, -39.219) (39.1709, -39.2512) (39.1856, -39.2859) (39.1987, -39.3235) (39.2102, -39.3644) (39.2193, -39.409) (39.2271, -39.4569) (39.2334, -39.5085) (39.2377, -39.5635) (39.2404, -39.6222) (39.2406, -39.6624) (39.2407, -39.683) knots 0 0 0 0 0.033787 0.066622 0.099285 0.131361 0.163585 0.196104 0.228902 0.262158 0.295991 0.330218 0.36506 0.400951 0.43762 0.475708 0.515381 0.556414 0.599765 0.646424 0.696431 0.749782 0.806573 0.867436 0.931887 1 1 1 1
  spline S25 degree 3 poles (39.2407, -39.683) (39.2406, -39.7039) (39.2404, -39.7444) (39.2377, -39.8033) (39.2334, -39.8587) (39.2274, -39.9103) (39.2201, -39.9584) (39.2103, -40.0027) (39.1993, -40.0434) (39.1864, -40.0807) (39.1719, -40.1151) (39.1562, -40.1472) (39.1385, -40.177) (39.1199, -40.2049) (39.0997, -40.2305) (39.0785, -40.2541) (39.0553, -40.2753) (39.031, -40.2945) (39.0053, -40.3114) (38.9791, -40.3263) (38.9521, -40.339) (38.9242, -40.3489) (38.8957, -40.3572) (38.8665, -40.3628) (38.8366, -40.3664) (38.8163, -40.3667) (38.8061, -40.3669) knots 0 0 0 0 0.068595 0.133246 0.194313 0.251279 0.304513 0.354235 0.400481 0.443411 0.484015 0.523252 0.561042 0.5979 0.633518 0.668314 0.702496 0.736685 0.770293 0.803437 0.835913 0.86846 0.900847 0.933467 0.966258 1 1 1 1
  spline S26 degree 3 poles (38.8061, -40.3669) (38.7957, -40.3667) (38.7752, -40.3664) (38.7448, -40.3629) (38.7151, -40.3572) (38.6862, -40.349) (38.6579, -40.3389) (38.6305, -40.3262) (38.6037, -40.3115) (38.5779, -40.2942) (38.5529, -40.2749) (38.5294, -40.2531) (38.5072, -40.2289) (38.4862, -40.2028) (38.4668, -40.1741) (38.4484, -40.1433) (38.4319, -40.11) (38.4161, -40.0746) (38.4024, -40.0363) (38.39, -39.9951) (38.38, -39.9507) (38.3717, -39.9033) (38.3653, -39.8526) (38.3606, -39.7988) (38.3581, -39.7419) (38.3576, -39.703) (38.3574, -39.683) knots 0 0 0 0 0.033788 0.067194 0.099862 0.132567 0.165151 0.197913 0.231319 0.265083 0.299255 0.334399 0.369943 0.406284 0.444064 0.482998 0.523354 0.565537 0.609613 0.656391 0.705885 0.758325 0.813832 0.872795 0.934722 1 1 1 1
  line L64 (44.5074, -39.6836) -> (44.374, -40.3336)
  line L65 (44.374, -40.3336) -> (43.8407, -40.3336)
  line L66 (43.8407, -40.3336) -> (43.8407, -40.2002)
  line L67 (43.8407, -40.2002) -> (44.2829, -40.2002)
  line L68 (44.2829, -40.2002) -> (44.353, -39.8583)
  spline S27 degree 3 poles (44.353, -39.8583) (44.3392, -39.8621) (44.3125, -39.8695) (44.2732, -39.8776) (44.2358, -39.8826) (44.2116, -39.8832) (44.1998, -39.8836) knots 0 0 0 0 0.275068 0.532901 0.773973 1 1 1 1
  spline S28 degree 3 poles (44.1998, -39.8836) (44.1853, -39.8833) (44.1568, -39.8826) (44.115, -39.8767) (44.0751, -39.8674) (44.0373, -39.8543) (44.0013, -39.8376) (43.9675, -39.8168) (43.9355, -39.7925) (43.9058, -39.7645) (43.8789, -39.7337) (43.8552, -39.7006) (43.8351, -39.6655) (43.8189, -39.628) (43.806, -39.5887) (43.7974, -39.547) (43.7917, -39.5033) (43.791, -39.4735) (43.7907, -39.4583) knots 0 0 0 0 0.065808 0.129394 0.190894 0.251281 0.310815 0.370371 0.430768 0.492881 0.555104 0.616067 0.677256 0.73826 0.800762 0.864778 0.931045 1 1 1 1
  spline S29 degree 3 poles (43.7907, -39.4583) (43.791, -39.4477) (43.7915, -39.4267) (43.7939, -39.3954) (43.7988, -39.3648) (43.8052, -39.3349) (43.8136, -39.3057) (43.8237, -39.2771) (43.8361, -39.2493) (43.8497, -39.2221) (43.865, -39.196) (43.882, -39.1716) (43.9, -39.1485) (43.9193, -39.1271) (43.9402, -39.1073) (43.9624, -39.0891) (43.9857, -39.0722) (44.0104, -39.0573) (44.0361, -39.0436) (44.0631, -39.0323) (44.0907, -39.0222) (44.1195, -39.0142) (44.1492, -39.0079) (44.18, -39.0036) (44.2117, -39.0005) (44.2332, -39.0003) (44.2441, -39.0002) knots 0 0 0 0 0.044014 0.087434 0.130118 0.172554 0.214555 0.256298 0.298438 0.340849 0.382715 0.423924 0.464246 0.504074 0.543862 0.583567 0.623094 0.663229 0.703551 0.743938 0.784541 0.82575 0.867757 0.910745 0.954914 1 1 1 1
  spline S30 degree 3 poles (44.2441, -39.0002) (44.2571, -39.0005) (44.2825, -39.001) (44.3199, -39.0063) (44.3558, -39.0138) (44.39, -39.0252) (44.4228, -39.0395) (44.4538, -39.0575) (44.4838, -39.0779) (44.5114, -39.102) (44.5371, -39.1284) (44.5601, -39.1569) (44.5806, -39.1873) (44.5982, -39.2196) (44.6133, -39.2537) (44.6251, -39.2898) (44.6346, -39.3276) (44.6387, -39.3537) (44.6407, -39.3669) knots 0 0 0 0 0.065421 0.128708 0.190236 0.250724 0.310637 0.370766 0.431615 0.493523 0.555883 0.617342 0.678668 0.740711 0.802985 0.866803 0.932347 1 1 1 1
  line L69 (44.6407, -39.3669) -> (44.524, -39.3669)
  spline S31 degree 3 poles (44.524, -39.3669) (44.5212, -39.3545) (44.5157, -39.3307) (44.5036, -39.2972) (44.4887, -39.2674) (44.4711, -39.2408) (44.4501, -39.2176) (44.4262, -39.1969) (44.3993, -39.1783) (44.3694, -39.1628) (44.3379, -39.1495) (44.305, -39.1407) (44.2714, -39.1345) (44.2487, -39.1339) (44.2373, -39.1336) knots 0 0 0 0 0.094687 0.181994 0.264377 0.34218 0.418618 0.496509 0.577369 0.661511 0.746733 0.831258 0.915206 1 1 1 1
  spline S32 degree 3 poles (44.2373, -39.1336) (44.2262, -39.1339) (44.2043, -39.1345) (44.172, -39.1391) (44.1409, -39.1462) (44.1112, -39.1569) (44.0824, -39.1698) (44.0552, -39.1864) (44.0289, -39.2055) (44.0042, -39.2274) (43.9816, -39.2516) (43.9616, -39.2774) (43.945, -39.3049) (43.931, -39.3337) (43.9204, -39.364) (43.9128, -39.3958) (43.9083, -39.429) (43.9077, -39.4517) (43.9074, -39.4633) knots 0 0 0 0 0.064207 0.126425 0.18768 0.248216 0.308305 0.369661 0.431699 0.495947 0.559758 0.622295 0.683911 0.745092 0.80674 0.869087 0.93329 1 1 1 1
  spline S33 degree 3 poles (43.9074, -39.4633) (43.9076, -39.4737) (43.9081, -39.4941) (43.912, -39.524) (43.9188, -39.5522) (43.9283, -39.579) (43.9403, -39.6043) (43.9549, -39.6283) (43.9725, -39.6504) (43.9926, -39.6709) (44.0146, -39.6898) (44.0389, -39.7059) (44.065, -39.7194) (44.0926, -39.7311) (44.1223, -39.7395) (44.1535, -39.7458) (44.1866, -39.7495) (44.2093, -39.75) (44.2209, -39.7502) knots 0 0 0 0 0.065351 0.127916 0.18836 0.247216 0.30563 0.36377 0.422661 0.482687 0.5433 0.604118 0.664965 0.727413 0.791468 0.858055 0.927037 1 1 1 1
  spline S34 degree 3 poles (44.2209, -39.7502) (44.231, -39.75) (44.2518, -39.7496) (44.2837, -39.7463) (44.3173, -39.741) (44.3523, -39.7337) (44.3889, -39.7242) (44.4271, -39.7128) (44.4668, -39.6992) (44.4936, -39.6889) (44.5074, -39.6836) knots 0 0 0 0 0.102203 0.211023 0.3251 0.446502 0.573788 0.708901 0.850358 1 1 1 1
  point P0 (22, -80)
  point P1 (32.8574, -36.7836)
extrude "Выдавливание13" cut sketch "Эскиз14" against normal blind 10 contours A15 | A16
move faces "Перенос1" translate (0, 0, 3) faces at (21.836, 37.9918, 62.5)
properties part number "joint1_level_part_2" material "Пластик АБС"
